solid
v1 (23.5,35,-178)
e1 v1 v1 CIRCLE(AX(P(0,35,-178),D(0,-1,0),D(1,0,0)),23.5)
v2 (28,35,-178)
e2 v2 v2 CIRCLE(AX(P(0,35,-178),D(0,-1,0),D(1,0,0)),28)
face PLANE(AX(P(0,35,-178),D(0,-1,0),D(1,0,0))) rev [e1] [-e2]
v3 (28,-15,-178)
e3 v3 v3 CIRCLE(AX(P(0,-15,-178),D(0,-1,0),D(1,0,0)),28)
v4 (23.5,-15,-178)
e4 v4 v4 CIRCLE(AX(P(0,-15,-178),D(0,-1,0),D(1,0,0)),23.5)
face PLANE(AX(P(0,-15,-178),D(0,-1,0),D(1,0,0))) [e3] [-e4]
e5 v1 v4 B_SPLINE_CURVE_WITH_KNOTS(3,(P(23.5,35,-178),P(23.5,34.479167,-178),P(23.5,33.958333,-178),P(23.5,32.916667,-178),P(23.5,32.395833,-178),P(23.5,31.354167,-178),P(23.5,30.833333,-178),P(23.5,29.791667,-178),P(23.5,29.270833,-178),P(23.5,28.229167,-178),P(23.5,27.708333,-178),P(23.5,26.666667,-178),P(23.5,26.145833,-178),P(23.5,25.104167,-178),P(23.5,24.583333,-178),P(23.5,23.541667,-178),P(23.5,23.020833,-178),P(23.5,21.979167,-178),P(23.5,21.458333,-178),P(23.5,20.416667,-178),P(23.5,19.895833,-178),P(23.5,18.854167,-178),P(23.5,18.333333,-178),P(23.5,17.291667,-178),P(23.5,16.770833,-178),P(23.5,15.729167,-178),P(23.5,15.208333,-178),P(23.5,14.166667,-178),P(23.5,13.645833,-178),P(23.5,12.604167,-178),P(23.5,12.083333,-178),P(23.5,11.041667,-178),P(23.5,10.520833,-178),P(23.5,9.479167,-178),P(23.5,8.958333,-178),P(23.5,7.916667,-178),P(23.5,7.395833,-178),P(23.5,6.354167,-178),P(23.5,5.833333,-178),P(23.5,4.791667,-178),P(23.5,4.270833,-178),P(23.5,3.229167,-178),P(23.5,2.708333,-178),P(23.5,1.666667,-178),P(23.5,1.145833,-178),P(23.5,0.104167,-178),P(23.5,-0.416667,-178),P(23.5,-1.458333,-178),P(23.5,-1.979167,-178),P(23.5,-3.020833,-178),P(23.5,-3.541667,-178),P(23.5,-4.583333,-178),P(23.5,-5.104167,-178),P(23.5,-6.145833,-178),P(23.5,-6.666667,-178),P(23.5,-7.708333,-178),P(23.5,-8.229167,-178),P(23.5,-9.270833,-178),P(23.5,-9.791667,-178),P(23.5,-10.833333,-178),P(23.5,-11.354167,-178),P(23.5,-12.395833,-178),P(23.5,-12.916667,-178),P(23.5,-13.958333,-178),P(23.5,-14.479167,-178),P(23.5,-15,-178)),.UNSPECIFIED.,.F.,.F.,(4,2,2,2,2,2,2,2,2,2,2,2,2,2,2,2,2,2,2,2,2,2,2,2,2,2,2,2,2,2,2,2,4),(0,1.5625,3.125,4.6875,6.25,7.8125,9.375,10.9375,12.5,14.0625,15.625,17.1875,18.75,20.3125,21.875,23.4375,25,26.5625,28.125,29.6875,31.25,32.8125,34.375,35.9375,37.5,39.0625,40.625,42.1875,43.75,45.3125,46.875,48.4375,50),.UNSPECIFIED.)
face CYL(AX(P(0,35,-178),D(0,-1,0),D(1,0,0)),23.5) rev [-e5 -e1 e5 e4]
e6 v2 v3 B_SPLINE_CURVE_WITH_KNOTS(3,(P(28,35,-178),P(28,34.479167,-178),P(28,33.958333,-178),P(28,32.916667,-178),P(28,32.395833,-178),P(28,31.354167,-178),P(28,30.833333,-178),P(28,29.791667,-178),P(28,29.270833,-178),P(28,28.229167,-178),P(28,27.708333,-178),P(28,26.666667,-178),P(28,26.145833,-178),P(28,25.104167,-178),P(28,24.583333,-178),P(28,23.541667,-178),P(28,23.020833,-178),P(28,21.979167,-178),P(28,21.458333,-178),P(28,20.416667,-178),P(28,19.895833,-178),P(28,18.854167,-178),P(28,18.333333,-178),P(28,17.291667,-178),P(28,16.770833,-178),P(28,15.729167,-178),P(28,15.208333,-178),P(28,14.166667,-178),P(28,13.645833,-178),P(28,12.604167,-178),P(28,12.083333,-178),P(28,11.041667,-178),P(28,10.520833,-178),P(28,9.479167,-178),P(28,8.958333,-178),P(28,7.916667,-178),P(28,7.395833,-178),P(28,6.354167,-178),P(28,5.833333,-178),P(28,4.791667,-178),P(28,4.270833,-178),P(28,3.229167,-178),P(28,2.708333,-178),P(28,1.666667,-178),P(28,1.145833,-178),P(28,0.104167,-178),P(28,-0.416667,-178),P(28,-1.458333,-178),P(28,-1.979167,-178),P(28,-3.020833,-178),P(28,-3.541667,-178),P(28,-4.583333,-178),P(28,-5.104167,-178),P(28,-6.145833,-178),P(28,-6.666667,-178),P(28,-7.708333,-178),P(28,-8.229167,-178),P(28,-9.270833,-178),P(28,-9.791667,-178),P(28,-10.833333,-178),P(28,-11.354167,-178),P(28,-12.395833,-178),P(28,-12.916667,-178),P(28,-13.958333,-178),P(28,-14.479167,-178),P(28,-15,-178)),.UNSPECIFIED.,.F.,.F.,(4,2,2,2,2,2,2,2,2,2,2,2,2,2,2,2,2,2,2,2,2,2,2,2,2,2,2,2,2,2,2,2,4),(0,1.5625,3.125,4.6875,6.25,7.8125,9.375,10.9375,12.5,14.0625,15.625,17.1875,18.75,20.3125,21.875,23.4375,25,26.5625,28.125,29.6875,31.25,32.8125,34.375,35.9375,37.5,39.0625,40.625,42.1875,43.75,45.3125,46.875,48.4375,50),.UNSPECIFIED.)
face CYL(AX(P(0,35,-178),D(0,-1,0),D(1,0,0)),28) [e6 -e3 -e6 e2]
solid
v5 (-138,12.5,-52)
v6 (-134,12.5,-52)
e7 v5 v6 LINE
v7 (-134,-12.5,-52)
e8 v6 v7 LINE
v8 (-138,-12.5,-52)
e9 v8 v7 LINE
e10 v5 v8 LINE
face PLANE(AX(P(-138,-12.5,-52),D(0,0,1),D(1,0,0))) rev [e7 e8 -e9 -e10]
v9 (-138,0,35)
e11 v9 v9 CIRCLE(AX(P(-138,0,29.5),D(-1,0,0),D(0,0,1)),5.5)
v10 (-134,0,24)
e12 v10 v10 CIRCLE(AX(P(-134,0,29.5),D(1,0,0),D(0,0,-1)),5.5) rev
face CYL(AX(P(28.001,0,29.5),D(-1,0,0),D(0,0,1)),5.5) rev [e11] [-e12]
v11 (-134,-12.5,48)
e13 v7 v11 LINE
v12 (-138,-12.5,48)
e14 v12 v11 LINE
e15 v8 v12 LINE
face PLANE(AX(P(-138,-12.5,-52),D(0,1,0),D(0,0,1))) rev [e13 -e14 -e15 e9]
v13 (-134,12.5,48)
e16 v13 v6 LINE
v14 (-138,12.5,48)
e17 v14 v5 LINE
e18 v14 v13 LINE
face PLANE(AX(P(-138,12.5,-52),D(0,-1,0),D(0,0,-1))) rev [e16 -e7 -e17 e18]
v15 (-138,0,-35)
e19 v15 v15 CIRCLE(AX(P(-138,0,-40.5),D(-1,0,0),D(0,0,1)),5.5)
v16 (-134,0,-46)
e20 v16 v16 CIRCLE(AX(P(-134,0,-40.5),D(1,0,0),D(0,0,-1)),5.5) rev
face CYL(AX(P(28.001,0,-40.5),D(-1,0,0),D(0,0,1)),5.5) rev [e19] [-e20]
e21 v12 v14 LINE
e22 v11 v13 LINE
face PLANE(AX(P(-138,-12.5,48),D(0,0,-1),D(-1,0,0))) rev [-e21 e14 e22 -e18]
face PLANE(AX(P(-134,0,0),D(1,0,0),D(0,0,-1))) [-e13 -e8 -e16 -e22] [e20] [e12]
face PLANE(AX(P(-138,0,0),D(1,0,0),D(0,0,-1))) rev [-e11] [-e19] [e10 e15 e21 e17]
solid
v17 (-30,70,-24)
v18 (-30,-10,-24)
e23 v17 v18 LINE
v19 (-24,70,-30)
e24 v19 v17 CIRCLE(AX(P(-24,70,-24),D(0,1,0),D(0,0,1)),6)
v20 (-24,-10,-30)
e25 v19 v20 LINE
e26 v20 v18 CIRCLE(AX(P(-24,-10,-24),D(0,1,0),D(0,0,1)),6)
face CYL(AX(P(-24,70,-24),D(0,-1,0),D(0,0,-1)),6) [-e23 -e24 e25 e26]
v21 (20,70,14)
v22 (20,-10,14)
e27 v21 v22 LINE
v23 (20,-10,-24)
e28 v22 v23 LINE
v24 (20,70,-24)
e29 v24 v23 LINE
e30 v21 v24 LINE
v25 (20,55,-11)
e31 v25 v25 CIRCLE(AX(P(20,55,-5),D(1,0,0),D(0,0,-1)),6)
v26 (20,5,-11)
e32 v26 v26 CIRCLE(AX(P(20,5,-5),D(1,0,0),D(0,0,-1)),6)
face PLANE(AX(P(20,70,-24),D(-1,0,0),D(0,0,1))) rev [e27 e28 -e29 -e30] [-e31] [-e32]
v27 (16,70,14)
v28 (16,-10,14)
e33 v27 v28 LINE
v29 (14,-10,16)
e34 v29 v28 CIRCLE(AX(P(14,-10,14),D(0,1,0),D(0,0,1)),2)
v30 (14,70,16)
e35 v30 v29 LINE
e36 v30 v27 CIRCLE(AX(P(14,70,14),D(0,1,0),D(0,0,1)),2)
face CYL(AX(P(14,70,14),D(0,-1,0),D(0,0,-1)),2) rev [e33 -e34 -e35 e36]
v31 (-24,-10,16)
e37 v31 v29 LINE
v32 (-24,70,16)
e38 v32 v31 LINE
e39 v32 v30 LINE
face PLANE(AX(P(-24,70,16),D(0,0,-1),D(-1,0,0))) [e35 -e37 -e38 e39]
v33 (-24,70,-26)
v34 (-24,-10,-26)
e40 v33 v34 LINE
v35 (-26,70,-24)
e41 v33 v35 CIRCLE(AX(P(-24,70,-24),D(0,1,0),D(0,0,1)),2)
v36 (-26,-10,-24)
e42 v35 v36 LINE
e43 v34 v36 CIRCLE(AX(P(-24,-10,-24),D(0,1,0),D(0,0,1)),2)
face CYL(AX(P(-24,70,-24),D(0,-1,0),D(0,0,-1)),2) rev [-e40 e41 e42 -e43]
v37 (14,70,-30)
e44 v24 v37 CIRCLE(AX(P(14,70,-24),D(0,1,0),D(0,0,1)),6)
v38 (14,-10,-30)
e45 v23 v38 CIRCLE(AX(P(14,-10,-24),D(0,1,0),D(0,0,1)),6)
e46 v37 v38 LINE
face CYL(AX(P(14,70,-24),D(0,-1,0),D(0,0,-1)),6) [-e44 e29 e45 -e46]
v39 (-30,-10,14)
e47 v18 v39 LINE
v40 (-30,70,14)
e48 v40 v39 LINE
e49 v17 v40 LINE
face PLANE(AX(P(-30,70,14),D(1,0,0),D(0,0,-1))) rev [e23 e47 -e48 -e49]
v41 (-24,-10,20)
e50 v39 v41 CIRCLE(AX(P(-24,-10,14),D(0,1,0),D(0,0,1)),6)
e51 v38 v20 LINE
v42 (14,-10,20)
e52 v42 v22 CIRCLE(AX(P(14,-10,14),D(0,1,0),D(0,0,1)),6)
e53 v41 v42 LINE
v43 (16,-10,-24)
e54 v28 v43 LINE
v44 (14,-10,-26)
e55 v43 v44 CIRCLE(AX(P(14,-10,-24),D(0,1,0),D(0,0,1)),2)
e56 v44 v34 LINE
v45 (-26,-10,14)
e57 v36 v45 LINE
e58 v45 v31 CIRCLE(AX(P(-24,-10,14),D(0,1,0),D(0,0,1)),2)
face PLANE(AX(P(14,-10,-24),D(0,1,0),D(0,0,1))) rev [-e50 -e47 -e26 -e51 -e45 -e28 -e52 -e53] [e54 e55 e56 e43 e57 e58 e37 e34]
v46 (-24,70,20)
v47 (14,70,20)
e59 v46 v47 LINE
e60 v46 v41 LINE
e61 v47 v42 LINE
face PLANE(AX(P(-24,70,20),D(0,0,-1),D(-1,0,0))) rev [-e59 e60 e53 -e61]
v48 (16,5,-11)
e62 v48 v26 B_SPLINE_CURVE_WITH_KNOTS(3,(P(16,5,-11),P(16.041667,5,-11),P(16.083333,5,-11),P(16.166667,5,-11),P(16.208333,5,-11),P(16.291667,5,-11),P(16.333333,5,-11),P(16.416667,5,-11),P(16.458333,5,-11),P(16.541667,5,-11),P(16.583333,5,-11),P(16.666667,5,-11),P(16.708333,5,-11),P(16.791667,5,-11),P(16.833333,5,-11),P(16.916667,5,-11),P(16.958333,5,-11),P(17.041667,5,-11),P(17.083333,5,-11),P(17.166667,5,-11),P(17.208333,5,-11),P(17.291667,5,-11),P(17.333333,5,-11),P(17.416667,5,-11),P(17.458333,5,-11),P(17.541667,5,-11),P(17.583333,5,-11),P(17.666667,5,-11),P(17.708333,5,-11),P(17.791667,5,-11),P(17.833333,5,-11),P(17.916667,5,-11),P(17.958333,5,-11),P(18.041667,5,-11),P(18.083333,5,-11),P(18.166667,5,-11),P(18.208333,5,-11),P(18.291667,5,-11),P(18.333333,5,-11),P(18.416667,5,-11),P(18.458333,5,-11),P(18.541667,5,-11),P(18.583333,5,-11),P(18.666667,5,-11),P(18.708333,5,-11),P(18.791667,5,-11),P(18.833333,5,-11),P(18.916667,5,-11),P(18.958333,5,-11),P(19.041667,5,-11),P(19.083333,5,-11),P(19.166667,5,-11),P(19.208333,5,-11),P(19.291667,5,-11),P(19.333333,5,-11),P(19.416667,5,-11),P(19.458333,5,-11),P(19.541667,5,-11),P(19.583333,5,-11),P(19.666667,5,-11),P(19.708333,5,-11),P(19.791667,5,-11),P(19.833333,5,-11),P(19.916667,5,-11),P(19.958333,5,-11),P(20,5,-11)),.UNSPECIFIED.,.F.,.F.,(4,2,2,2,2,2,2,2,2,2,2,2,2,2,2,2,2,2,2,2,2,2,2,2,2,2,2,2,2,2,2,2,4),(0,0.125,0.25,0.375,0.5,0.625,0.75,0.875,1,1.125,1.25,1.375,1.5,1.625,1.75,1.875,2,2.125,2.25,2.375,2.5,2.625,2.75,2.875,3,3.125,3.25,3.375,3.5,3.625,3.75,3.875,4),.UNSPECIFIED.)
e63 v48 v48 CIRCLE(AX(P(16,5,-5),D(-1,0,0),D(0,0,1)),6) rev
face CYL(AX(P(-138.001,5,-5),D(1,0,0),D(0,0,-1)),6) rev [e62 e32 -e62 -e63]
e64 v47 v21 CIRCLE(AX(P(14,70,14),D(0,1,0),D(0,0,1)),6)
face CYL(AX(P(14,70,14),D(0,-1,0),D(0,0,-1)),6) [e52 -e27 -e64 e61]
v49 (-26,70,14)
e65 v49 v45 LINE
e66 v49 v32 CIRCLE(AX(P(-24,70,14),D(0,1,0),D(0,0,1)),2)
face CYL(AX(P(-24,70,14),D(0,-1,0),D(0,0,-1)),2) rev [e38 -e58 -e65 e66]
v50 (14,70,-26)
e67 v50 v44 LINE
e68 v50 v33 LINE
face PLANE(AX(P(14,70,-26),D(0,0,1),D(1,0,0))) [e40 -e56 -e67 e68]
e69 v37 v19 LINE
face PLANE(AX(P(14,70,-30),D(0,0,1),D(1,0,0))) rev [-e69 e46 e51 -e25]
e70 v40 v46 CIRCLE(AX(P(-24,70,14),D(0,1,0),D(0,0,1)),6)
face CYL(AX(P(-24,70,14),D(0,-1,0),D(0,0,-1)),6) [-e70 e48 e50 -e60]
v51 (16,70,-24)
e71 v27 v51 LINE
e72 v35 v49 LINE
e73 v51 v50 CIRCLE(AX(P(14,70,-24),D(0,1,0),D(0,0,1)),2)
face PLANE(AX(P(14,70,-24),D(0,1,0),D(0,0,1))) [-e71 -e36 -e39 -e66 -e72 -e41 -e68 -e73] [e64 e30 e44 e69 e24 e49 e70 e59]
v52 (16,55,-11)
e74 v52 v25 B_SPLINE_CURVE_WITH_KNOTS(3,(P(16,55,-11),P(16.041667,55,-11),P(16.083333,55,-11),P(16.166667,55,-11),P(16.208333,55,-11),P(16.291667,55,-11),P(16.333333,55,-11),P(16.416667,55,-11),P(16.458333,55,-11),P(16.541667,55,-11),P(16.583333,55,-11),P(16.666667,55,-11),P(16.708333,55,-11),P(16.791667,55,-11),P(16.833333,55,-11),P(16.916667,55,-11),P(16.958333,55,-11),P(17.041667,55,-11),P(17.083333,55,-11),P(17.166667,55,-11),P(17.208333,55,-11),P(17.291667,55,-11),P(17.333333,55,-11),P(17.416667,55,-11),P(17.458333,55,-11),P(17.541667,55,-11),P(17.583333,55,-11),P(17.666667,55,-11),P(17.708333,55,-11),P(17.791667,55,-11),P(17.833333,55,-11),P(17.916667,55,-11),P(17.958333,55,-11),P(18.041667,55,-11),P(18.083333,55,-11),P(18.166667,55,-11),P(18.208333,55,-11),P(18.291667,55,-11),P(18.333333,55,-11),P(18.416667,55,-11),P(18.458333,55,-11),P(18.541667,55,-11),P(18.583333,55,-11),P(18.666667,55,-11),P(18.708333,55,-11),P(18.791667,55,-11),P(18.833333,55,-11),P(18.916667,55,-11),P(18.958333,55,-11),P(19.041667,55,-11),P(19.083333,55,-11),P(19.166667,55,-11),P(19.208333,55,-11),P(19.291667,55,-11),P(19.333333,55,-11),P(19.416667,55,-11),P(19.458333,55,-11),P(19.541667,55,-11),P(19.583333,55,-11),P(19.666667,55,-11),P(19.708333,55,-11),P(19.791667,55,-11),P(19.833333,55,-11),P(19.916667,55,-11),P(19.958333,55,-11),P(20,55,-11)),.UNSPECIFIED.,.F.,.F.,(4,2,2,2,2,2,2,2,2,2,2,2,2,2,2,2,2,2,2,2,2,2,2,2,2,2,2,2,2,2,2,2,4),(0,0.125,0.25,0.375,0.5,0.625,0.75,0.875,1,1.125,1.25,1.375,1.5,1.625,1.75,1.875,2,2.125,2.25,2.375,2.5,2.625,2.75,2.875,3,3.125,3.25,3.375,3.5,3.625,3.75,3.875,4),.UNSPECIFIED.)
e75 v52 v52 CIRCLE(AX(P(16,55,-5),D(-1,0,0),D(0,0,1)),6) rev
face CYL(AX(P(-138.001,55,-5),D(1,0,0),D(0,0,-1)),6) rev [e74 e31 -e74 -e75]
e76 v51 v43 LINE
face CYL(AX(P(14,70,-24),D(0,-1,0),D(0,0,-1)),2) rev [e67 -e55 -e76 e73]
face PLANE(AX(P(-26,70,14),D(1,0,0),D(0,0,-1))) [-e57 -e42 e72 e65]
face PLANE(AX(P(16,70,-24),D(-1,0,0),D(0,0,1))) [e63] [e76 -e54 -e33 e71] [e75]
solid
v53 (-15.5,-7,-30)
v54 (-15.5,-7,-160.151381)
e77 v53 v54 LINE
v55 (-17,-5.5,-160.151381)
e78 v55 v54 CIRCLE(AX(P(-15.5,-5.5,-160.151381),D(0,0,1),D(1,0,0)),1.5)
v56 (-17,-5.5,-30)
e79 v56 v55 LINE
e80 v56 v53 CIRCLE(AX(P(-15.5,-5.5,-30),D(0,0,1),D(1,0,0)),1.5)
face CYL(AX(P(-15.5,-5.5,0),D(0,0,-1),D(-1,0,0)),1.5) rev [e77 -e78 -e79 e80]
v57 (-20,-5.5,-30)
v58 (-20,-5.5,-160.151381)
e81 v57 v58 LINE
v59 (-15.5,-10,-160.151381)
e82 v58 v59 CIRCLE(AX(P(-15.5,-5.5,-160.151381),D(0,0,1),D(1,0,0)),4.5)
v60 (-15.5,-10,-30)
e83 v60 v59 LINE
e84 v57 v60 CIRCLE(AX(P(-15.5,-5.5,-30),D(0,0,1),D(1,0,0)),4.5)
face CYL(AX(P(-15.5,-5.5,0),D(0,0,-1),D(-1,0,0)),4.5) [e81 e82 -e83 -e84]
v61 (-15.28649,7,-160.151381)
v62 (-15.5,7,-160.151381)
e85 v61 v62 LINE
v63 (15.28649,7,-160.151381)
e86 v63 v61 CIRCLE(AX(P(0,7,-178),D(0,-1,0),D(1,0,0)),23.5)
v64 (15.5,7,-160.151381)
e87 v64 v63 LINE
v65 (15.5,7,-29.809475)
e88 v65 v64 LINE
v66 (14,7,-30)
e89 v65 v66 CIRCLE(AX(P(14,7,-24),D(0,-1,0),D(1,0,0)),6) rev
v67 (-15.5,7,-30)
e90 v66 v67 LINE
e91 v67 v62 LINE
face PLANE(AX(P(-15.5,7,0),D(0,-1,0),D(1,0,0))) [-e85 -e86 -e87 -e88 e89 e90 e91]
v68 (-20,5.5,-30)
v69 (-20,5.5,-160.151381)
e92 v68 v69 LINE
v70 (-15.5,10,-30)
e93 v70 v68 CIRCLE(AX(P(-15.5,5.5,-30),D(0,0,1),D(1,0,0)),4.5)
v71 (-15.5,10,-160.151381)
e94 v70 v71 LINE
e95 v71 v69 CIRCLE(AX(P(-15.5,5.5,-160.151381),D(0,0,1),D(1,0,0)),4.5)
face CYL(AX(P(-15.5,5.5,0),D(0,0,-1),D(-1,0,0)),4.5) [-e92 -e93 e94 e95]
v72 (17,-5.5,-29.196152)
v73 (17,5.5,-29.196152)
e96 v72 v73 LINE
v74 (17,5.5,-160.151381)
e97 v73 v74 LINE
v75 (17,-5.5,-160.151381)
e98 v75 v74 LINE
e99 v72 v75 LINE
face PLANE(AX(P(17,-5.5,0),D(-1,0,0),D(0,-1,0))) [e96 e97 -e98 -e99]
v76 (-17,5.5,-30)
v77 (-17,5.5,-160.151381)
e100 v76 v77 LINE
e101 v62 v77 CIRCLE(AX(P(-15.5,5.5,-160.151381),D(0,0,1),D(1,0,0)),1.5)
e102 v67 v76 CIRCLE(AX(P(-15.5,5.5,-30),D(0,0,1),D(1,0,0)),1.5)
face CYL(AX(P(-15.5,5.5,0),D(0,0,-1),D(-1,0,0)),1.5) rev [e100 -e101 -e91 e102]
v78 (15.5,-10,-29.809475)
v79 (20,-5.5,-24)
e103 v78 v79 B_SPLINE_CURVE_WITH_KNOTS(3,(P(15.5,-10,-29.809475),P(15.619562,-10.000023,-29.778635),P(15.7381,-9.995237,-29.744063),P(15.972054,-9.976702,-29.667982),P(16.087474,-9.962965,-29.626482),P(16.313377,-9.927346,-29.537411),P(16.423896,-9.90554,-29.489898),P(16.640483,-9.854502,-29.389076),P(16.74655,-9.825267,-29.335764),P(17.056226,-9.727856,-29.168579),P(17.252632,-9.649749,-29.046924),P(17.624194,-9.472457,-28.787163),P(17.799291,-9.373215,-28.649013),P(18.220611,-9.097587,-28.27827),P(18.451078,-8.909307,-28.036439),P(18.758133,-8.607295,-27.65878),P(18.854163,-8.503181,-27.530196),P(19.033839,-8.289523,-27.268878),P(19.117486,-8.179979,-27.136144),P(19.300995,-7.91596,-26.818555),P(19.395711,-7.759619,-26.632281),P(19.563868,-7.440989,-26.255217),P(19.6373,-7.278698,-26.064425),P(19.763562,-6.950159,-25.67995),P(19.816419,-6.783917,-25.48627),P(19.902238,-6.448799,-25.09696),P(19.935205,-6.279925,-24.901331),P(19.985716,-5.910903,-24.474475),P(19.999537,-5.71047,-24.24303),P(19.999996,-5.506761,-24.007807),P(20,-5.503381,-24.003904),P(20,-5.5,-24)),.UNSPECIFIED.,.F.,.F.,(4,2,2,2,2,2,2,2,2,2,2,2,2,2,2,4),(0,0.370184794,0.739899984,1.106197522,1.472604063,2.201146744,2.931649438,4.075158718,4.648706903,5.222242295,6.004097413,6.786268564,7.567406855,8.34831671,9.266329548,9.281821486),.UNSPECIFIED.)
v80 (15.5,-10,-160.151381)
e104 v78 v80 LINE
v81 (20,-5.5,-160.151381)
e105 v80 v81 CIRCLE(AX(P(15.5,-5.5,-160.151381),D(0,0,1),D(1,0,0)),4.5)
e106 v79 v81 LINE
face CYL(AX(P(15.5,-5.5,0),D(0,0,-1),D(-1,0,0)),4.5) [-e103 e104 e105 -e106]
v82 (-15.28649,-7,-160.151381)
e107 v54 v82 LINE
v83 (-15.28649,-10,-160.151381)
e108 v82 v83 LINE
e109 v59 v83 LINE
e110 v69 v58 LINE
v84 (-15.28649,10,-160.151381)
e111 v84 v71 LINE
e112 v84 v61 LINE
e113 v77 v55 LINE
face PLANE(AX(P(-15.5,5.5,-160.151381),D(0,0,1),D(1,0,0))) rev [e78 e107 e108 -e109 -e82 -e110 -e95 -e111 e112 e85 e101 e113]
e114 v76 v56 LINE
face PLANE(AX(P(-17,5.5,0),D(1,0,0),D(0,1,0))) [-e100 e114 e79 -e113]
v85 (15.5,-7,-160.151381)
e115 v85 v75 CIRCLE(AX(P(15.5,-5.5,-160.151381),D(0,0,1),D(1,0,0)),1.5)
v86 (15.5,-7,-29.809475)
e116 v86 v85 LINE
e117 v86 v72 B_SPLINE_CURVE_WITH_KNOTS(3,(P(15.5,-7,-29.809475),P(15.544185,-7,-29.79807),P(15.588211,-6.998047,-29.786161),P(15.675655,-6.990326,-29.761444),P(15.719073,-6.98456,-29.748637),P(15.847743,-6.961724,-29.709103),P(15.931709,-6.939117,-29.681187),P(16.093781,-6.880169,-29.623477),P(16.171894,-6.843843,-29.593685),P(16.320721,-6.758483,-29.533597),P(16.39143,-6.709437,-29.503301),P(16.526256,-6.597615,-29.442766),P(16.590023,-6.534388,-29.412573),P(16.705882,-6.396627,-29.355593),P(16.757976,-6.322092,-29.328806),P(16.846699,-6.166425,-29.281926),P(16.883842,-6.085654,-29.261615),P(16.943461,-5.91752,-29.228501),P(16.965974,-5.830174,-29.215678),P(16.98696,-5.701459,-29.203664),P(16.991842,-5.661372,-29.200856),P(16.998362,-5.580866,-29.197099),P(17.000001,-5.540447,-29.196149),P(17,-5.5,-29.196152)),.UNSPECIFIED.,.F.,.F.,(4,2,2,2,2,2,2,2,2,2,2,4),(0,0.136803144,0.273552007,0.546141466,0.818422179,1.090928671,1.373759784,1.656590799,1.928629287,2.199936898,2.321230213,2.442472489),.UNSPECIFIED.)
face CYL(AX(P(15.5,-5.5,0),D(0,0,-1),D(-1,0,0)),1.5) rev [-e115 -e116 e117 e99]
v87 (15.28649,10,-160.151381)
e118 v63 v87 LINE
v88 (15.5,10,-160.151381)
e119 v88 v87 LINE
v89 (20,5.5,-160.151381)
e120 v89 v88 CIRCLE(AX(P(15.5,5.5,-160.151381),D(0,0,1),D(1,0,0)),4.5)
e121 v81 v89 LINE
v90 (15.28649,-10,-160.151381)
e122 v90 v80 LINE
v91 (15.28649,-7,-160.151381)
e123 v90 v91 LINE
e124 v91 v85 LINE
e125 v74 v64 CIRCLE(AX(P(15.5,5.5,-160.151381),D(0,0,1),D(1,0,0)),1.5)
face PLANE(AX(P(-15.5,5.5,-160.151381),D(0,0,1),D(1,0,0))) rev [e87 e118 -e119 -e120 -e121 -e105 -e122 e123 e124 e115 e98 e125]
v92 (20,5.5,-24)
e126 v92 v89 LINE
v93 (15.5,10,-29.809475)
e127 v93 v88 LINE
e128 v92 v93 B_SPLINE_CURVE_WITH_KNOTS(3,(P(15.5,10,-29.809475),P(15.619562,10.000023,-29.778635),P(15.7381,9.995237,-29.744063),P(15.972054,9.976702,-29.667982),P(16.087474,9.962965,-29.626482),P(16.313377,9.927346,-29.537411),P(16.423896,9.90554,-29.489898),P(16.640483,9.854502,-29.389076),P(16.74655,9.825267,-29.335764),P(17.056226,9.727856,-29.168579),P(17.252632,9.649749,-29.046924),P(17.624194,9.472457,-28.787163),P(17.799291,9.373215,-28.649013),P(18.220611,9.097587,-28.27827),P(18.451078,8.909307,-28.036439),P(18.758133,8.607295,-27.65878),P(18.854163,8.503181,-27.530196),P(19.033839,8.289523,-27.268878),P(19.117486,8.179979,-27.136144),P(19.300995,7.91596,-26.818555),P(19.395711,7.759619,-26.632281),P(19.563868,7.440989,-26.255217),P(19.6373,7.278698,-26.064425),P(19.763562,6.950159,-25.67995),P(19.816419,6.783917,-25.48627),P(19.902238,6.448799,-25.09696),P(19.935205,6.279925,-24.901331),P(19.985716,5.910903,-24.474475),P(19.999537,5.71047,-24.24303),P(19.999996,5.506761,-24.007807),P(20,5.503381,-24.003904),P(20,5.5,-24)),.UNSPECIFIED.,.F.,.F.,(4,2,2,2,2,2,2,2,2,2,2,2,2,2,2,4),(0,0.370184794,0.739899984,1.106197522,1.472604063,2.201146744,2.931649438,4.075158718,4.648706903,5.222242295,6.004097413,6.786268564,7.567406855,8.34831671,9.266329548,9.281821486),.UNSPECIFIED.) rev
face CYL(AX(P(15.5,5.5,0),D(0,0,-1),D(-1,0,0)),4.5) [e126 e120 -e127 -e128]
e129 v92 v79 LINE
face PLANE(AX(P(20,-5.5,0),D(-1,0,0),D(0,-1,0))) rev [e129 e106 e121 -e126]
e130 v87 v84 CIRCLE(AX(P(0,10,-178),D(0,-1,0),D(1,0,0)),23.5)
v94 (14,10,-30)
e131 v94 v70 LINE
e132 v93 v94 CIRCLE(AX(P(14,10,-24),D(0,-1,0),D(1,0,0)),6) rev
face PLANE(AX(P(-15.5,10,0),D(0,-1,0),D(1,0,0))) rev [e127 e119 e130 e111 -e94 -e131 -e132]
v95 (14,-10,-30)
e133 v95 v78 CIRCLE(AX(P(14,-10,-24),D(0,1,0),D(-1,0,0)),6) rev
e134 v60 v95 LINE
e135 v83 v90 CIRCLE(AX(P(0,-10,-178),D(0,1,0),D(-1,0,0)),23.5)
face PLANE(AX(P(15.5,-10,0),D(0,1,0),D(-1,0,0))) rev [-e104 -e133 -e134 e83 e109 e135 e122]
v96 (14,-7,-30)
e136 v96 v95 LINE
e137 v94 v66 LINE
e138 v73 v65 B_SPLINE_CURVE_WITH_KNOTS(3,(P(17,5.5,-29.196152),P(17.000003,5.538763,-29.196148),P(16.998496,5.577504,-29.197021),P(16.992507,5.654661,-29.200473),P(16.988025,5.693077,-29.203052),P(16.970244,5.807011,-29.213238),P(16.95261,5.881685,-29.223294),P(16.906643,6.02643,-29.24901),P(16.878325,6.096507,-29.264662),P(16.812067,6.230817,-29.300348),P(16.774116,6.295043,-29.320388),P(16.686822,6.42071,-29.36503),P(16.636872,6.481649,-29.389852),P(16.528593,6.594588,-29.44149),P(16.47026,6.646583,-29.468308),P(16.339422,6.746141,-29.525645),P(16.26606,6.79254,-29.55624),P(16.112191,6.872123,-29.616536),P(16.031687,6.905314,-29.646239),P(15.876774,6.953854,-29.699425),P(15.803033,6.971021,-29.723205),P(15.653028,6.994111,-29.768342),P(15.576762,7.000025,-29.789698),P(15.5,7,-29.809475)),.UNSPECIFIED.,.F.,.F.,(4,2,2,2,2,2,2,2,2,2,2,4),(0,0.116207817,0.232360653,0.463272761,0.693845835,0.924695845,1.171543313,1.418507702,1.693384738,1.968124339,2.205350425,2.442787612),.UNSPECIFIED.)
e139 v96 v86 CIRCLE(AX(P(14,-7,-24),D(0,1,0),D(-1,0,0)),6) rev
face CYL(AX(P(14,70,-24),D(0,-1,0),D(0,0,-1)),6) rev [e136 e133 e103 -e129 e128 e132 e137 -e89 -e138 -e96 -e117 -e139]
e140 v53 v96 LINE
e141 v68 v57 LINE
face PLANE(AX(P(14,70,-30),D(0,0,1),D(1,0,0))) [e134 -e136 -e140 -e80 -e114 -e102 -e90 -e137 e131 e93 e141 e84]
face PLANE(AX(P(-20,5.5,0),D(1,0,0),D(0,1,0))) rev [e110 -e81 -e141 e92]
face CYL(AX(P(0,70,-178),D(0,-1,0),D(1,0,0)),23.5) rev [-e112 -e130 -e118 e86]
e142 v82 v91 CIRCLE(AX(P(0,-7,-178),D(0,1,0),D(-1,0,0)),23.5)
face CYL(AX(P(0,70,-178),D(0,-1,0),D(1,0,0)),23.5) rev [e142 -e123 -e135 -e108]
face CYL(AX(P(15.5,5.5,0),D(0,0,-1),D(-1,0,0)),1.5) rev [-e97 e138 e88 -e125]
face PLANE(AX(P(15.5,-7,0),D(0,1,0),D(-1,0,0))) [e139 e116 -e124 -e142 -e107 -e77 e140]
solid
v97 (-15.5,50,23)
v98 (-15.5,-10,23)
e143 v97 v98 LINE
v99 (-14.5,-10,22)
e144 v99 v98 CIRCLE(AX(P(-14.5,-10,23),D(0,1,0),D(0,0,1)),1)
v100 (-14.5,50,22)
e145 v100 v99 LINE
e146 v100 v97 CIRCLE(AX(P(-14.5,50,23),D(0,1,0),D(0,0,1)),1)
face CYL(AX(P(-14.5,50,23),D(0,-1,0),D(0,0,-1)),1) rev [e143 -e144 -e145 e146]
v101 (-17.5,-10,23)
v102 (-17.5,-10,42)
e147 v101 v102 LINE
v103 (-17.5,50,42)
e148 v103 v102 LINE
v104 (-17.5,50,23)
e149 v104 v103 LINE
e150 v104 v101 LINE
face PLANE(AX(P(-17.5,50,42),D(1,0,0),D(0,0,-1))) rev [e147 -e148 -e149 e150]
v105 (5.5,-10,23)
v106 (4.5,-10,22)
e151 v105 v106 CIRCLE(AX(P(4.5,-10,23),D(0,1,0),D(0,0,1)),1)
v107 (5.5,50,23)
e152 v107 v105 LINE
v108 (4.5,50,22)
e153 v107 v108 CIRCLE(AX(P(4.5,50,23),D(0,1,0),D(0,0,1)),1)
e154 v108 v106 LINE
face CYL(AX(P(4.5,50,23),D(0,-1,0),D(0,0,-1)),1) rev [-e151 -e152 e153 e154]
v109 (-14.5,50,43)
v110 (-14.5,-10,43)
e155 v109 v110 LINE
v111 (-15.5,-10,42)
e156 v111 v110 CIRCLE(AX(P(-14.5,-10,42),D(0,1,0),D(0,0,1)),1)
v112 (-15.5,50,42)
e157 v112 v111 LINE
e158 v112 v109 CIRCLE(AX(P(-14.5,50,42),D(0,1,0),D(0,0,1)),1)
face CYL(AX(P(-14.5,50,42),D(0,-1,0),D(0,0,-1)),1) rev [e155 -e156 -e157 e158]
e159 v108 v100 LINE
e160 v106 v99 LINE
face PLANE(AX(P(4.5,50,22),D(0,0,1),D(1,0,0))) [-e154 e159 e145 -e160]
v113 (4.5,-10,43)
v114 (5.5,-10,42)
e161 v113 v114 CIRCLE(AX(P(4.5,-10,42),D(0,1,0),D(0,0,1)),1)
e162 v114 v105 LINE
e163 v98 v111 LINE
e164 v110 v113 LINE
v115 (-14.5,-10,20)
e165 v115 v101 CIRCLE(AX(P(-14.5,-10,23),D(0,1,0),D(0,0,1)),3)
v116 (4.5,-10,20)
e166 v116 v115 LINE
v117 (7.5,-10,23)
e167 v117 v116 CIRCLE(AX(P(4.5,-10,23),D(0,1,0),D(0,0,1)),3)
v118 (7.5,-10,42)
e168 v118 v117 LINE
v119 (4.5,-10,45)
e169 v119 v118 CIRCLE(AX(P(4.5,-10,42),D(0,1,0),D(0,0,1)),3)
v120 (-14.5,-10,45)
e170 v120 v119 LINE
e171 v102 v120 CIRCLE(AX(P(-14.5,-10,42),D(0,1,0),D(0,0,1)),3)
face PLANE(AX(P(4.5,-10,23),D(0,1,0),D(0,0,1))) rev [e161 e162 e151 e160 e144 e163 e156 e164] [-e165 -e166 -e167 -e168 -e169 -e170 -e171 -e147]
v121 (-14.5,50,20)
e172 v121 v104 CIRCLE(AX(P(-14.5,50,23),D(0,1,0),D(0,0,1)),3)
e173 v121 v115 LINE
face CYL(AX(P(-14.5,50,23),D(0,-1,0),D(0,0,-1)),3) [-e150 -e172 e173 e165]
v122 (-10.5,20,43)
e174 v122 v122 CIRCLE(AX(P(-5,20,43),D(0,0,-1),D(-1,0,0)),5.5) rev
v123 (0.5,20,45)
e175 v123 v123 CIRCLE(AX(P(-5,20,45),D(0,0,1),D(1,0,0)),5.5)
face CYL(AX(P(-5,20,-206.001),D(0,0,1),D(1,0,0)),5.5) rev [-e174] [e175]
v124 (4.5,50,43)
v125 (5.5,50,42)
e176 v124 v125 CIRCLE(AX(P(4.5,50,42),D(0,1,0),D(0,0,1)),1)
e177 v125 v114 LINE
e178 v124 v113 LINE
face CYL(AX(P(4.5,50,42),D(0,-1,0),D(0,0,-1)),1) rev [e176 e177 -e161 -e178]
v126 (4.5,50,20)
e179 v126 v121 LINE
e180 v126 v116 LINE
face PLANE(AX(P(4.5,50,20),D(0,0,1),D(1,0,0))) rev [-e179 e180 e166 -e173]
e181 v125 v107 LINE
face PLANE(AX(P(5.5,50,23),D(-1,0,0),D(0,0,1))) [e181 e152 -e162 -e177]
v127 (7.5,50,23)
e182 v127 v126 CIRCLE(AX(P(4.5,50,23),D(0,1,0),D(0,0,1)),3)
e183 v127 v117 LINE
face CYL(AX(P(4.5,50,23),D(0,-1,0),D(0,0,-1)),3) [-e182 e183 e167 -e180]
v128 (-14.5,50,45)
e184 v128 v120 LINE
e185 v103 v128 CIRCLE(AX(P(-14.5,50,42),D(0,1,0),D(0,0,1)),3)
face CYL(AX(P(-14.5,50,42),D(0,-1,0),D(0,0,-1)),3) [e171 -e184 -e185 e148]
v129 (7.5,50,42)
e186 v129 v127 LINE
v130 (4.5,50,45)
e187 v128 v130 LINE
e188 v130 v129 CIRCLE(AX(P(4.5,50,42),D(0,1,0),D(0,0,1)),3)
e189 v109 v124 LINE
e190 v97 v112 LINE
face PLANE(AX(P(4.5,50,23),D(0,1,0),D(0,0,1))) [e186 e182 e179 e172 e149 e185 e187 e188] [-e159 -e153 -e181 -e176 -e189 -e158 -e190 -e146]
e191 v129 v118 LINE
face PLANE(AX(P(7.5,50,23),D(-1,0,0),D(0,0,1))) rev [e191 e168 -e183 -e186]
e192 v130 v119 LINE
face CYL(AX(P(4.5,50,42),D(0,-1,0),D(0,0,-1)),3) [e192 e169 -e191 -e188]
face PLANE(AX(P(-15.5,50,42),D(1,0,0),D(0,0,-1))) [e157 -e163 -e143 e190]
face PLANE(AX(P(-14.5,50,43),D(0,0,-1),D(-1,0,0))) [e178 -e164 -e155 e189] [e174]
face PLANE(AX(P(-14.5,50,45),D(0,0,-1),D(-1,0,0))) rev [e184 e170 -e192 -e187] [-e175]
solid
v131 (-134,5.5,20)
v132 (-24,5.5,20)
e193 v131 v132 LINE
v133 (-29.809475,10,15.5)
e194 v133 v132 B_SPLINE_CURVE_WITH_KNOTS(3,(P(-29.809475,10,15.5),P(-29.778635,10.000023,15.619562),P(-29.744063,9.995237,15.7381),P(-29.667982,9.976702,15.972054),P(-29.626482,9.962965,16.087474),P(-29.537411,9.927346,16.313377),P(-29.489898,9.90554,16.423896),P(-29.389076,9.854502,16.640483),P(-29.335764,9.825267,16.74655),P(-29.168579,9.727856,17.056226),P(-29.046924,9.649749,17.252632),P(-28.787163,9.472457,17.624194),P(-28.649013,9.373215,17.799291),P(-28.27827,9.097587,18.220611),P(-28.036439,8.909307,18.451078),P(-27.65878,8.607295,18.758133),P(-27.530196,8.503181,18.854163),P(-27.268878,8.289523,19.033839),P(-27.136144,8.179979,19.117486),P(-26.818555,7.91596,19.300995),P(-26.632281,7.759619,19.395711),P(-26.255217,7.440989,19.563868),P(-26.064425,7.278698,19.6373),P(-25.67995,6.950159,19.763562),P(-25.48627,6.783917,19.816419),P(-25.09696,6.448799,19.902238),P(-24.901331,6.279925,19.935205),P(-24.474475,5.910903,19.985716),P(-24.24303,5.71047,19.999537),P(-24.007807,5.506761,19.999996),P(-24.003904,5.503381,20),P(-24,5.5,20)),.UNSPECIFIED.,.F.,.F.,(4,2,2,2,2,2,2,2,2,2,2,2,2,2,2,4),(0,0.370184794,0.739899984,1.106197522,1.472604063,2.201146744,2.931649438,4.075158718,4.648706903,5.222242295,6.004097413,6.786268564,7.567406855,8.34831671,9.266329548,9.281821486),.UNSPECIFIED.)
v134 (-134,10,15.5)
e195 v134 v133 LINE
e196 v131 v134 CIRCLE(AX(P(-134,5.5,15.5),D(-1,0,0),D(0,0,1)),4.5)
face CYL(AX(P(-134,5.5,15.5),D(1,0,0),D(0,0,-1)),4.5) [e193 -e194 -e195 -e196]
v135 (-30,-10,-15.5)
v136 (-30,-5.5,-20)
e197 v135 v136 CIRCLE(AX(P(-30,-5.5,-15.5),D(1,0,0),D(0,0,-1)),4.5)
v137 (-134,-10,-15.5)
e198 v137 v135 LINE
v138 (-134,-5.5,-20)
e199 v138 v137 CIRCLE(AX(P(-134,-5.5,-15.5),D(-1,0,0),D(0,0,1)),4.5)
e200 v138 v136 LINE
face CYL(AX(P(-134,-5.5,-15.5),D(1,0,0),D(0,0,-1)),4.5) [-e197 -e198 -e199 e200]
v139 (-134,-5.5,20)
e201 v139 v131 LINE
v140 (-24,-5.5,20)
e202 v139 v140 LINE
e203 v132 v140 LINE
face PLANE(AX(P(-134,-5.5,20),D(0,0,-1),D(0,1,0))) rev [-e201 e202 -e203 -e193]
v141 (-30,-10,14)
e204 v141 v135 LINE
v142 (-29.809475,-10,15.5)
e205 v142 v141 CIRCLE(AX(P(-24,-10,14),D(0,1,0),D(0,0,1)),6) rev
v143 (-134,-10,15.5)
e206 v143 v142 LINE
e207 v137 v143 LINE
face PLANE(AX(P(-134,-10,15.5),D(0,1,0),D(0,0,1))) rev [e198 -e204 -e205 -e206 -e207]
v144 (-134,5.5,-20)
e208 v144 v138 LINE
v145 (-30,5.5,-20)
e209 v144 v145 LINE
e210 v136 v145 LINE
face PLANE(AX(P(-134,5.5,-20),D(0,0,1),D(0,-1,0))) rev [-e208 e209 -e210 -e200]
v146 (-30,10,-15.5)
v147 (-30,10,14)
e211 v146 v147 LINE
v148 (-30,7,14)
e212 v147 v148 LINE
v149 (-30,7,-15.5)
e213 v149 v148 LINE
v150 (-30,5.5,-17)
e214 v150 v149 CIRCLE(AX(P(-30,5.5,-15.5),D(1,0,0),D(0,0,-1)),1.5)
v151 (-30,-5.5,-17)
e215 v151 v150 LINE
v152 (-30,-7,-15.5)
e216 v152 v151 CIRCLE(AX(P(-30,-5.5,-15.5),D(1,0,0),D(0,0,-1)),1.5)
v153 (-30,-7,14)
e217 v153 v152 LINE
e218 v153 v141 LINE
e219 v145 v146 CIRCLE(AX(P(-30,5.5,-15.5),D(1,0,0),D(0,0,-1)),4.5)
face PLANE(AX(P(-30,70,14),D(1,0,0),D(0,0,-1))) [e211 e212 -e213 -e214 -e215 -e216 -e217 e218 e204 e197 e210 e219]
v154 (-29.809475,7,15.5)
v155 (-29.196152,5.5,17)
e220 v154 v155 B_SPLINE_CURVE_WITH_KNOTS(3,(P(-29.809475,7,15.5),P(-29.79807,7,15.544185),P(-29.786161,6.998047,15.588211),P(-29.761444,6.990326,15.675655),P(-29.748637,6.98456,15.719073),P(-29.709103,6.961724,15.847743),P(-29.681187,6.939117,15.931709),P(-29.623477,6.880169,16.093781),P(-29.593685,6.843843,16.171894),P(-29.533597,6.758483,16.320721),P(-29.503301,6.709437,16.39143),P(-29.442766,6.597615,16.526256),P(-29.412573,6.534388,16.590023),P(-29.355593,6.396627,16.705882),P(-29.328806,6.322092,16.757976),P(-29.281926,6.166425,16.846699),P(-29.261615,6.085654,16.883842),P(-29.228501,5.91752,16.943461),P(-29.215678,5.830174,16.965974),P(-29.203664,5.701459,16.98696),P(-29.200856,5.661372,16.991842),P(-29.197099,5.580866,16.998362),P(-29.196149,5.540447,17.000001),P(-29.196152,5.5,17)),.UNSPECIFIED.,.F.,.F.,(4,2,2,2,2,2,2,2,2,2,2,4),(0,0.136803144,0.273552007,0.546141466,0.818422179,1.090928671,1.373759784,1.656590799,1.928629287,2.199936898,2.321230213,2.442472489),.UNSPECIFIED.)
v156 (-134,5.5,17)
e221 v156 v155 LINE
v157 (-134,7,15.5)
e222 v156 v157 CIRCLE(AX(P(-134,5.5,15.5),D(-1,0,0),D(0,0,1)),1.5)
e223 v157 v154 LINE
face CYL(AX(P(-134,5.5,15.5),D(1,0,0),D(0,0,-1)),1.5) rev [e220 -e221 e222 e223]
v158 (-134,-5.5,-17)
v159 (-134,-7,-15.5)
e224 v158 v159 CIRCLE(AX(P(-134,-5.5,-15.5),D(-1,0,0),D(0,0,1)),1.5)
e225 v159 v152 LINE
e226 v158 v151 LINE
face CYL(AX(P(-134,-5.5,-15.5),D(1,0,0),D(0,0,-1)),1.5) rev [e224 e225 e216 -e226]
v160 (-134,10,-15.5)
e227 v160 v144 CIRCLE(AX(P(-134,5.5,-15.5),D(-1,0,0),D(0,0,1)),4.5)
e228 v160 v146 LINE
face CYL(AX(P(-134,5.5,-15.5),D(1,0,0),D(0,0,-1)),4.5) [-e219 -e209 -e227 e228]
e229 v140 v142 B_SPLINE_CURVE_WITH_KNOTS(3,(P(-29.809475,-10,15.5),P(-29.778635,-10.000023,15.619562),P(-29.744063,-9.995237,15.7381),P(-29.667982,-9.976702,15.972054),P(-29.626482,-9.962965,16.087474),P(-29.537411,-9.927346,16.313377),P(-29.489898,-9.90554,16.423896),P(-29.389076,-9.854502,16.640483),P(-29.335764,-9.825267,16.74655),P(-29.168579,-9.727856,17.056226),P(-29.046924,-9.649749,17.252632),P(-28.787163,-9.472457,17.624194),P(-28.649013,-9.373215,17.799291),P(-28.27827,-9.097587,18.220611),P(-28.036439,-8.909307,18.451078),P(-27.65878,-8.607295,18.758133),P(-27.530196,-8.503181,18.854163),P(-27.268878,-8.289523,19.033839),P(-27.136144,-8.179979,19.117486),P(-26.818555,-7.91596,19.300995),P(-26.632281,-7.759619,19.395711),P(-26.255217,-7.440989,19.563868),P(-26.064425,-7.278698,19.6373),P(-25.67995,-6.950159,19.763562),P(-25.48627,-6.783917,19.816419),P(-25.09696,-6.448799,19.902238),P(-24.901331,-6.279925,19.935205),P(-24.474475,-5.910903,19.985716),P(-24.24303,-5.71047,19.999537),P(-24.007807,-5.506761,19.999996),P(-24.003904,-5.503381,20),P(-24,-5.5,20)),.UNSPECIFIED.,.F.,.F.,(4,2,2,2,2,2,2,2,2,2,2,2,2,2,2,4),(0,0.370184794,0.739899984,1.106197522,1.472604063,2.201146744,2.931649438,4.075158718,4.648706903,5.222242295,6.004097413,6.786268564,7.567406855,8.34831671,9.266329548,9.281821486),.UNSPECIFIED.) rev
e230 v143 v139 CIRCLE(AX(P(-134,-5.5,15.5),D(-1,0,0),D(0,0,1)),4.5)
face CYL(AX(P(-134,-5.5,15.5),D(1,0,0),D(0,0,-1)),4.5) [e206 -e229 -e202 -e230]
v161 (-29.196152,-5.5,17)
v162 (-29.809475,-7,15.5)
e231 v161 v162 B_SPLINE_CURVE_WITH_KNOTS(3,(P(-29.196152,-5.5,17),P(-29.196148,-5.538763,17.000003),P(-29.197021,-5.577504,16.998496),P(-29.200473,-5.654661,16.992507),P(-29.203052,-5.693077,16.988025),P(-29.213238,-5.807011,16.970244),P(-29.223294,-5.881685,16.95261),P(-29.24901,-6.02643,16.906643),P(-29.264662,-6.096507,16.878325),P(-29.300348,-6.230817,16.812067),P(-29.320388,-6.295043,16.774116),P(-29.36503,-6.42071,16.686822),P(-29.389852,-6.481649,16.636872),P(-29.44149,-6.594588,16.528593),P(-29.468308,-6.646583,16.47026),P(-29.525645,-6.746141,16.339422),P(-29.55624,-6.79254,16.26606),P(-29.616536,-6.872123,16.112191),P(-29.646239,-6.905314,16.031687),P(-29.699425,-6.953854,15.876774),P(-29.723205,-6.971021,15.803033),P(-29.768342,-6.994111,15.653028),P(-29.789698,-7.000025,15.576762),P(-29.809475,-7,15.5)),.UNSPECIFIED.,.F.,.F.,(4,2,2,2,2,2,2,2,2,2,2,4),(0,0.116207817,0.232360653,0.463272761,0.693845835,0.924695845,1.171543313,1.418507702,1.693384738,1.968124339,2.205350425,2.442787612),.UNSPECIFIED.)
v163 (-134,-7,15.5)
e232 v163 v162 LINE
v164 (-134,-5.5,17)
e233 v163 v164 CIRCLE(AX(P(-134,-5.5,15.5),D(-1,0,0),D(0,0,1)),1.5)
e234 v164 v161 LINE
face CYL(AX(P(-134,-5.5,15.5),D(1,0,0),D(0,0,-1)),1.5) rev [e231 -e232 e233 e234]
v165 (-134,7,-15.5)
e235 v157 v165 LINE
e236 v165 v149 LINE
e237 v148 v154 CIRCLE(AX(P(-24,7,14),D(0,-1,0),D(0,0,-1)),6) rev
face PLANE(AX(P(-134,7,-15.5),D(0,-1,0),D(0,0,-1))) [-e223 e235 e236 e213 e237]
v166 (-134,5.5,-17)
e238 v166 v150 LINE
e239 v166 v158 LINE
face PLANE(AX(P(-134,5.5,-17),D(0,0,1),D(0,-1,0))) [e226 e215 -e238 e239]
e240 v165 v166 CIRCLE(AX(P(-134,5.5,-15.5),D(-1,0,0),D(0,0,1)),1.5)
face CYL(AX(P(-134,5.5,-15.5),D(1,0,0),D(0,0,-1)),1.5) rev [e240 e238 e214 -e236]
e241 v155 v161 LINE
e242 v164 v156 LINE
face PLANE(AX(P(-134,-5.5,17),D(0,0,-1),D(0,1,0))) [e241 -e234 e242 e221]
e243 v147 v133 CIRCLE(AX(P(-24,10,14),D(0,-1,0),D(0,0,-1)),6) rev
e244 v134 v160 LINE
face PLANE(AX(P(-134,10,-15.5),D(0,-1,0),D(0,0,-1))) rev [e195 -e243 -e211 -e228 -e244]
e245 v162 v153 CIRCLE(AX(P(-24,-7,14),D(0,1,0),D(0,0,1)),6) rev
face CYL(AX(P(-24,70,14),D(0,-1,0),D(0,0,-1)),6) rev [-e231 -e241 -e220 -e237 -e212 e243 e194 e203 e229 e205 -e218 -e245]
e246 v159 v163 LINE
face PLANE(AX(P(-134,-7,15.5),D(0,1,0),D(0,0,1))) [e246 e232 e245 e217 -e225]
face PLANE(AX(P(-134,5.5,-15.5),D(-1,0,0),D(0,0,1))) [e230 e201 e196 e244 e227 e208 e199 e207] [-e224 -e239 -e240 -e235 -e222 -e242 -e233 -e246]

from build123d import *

# Parameters (mm, degrees)
AXBXS_8645_68_40_X_20_X_3_1_DEPTH        = 173.360679775
AXBXS_8645_68_40_X_20_X_3_1_2_DEPTH      = 134
AXBXS_8645_68_40_X_20_X_3_1_2_DEPTH_BACK = 23.360679775
BXBXS_8639_82_50_X_50_X_4_2_DEPTH        = 10
BXBXS_8639_82_50_X_50_X_4_2_2_DEPTH      = 70
WELD_START                               = -10
WELD_TRIM_1_DEPTH                        = 20
WELD_TRIM_1_2_DEPTH                      = 20
EXTRUDE_1_DEPTH                          = 5
EXTRUDE_1_DEPTH_BACK                     = 45
SKETCH_8_R                               = 28
SKETCH_8_R_2                             = 23.5
MOVE_FACE_1_BY                           = 10.151380586
CUT_EXTRUDE_1_DEPTH                      = 261.032690304
CUT_EXTRUDE_1_DEPTH_BACK                 = 261.032690304
SKETCH_10_R                              = 23.5
SKETCH_11_W                              = 100
SKETCH_11_H                              = 25
EXTRUDE_2_DEPTH                          = 4
SKETCH_12_R                              = 5.5
CUT_EXTRUDE_2_DEPTH                      = 4
BXBXS_8639_82_25_X_25_X_2_1_DEPTH        = 60
SKETCH_15_R                              = 5.5
CUT_EXTRUDE_3_DEPTH                      = 2
SKETCH_18_R                              = 6
CUT_EXTRUDE_6_DEPTH                      = 4


# Read off the part's stored shape, not the designer's step: Отсечь/Удлинить1
with BuildPart() as part:
    # Sketch1 on segment 1 (carried to segment 1) → Труба axbxs гост8645-68 40 X 20 X 3(1) (new body)
    with BuildSketch(Plane(origin=(0, 0, -150), x_dir=(0, 1, 0), z_dir=(0, 0, 1))):
        with BuildLine():
            Line((-5.5, -20), (5.5, -20))
            ThreePointArc((5.5, -20), (8.681980515, -18.681980515), (10, -15.5))
            Line((10, -15.5), (10, 15.5))
            ThreePointArc((10, 15.5), (8.681980515, 18.681980515), (5.5, 20))
            Line((5.5, 20), (-5.5, 20))
            ThreePointArc((-5.5, 20), (-8.681980515, 18.681980515), (-10, 15.5))
            Line((-10, 15.5), (-10, -15.5))
            ThreePointArc((-10, -15.5), (-8.681980515, -18.681980515), (-5.5, -20))
        make_face()
        with BuildLine():
            Line((-5.5, -17), (5.5, -17))
            ThreePointArc((5.5, -17), (6.560660172, -16.560660172), (7, -15.5))
            Line((7, -15.5), (7, 15.5))
            ThreePointArc((7, 15.5), (6.560660172, 16.560660172), (5.5, 17))
            Line((5.5, 17), (-5.5, 17))
            ThreePointArc((-5.5, 17), (-6.560660172, 16.560660172), (-7, 15.5))
            Line((-7, 15.5), (-7, -15.5))
            ThreePointArc((-7, -15.5), (-6.560660172, -16.560660172), (-5.5, -17))
        make_face(mode=Mode.SUBTRACT)
    extrude(amount=AXBXS_8645_68_40_X_20_X_3_1_DEPTH)

    # Труба axbxs гост8645-68 40 X 20 X 3(1) mitre 1
    split(bisect_by=Plane(origin=(0, 0, 0), x_dir=(0, 1, 0), z_dir=(0.707106781, 0, -0.707106781)), keep=Keep.TOP)

    # Weld Trim 1 2 outline → Weld Trim 1 2 (cut)
    with BuildSketch(Plane(origin=(0, 0, 0), x_dir=(1, 0, 0), z_dir=(0, 1, 0)).offset(WELD_START)):
        with BuildLine():
            Line((14, 30), (-20, 30))
            Line((-20, 30), (-20, 20))
            Line((-20, 20), (20, -20))
            Line((20, -20), (20, 24))
            ThreePointArc((20, 24), (18.242640687, 28.242640687), (14, 30))
        make_face()
    extrude(amount=WELD_TRIM_1_2_DEPTH, mode=Mode.SUBTRACT)

    # Move Face 1: a face moved outward by 10.151381
    extrude(part.faces().sort_by_distance((0, -8, -150))[0], amount=MOVE_FACE_1_BY, dir=(0, 0, -1))

    # Эскиз10 → Вырез-Вытянуть1 (cut, two sides: drawn at the far end of the back side and taken through both)
    with BuildSketch(Plane.XZ.offset(15).offset(-CUT_EXTRUDE_1_DEPTH_BACK)):
        with Locations((0, -178)):
            Circle(SKETCH_10_R)
    extrude(amount=CUT_EXTRUDE_1_DEPTH + CUT_EXTRUDE_1_DEPTH_BACK, mode=Mode.SUBTRACT)


with BuildPart() as body_2:
    # Sketch1 → axbxs _8645-68 40 X 20 X 3_1 2 (new, two sides: drawn at the far end of the back side and taken through both)
    with BuildSketch(Plane(origin=(0, 0, 0), x_dir=(0, 1, 0), z_dir=(-1, 0, 0)).offset(-AXBXS_8645_68_40_X_20_X_3_1_2_DEPTH_BACK)):
        with BuildLine():
            Line((-5.5, -20), (5.5, -20))
            ThreePointArc((5.5, -20), (8.681980515, -18.681980515), (10, -15.5))
            Line((10, -15.5), (10, 15.5))
            ThreePointArc((10, 15.5), (8.681980515, 18.681980515), (5.5, 20))
            Line((5.5, 20), (-5.5, 20))
            ThreePointArc((-5.5, 20), (-8.681980515, 18.681980515), (-10, 15.5))
            Line((-10, 15.5), (-10, -15.5))
            ThreePointArc((-10, -15.5), (-8.681980515, -18.681980515), (-5.5, -20))
        make_face()
        with BuildLine():
            Line((-5.5, -17), (5.5, -17))
            ThreePointArc((5.5, -17), (6.560660172, -16.560660172), (7, -15.5))
            Line((7, -15.5), (7, 15.5))
            ThreePointArc((7, 15.5), (6.560660172, 16.560660172), (5.5, 17))
            Line((5.5, 17), (-5.5, 17))
            ThreePointArc((-5.5, 17), (-6.560660172, 16.560660172), (-7, 15.5))
            Line((-7, 15.5), (-7, -15.5))
            ThreePointArc((-7, -15.5), (-6.560660172, -16.560660172), (-5.5, -17))
        make_face(mode=Mode.SUBTRACT)
    extrude(amount=AXBXS_8645_68_40_X_20_X_3_1_2_DEPTH + AXBXS_8645_68_40_X_20_X_3_1_2_DEPTH_BACK)

    # axbxs _8645-68 40 X 20 X 3_1 2 mitre 1
    split(bisect_by=Plane(origin=(0, 0, 0), x_dir=(0, -1, 0), z_dir=(-0.707106781, 0, 0.707106781)), keep=Keep.TOP)

    # Weld Trim 1 outline → Weld Trim 1 (cut)
    with BuildSketch(Plane(origin=(0, 0, 0), x_dir=(1, 0, 0), z_dir=(0, 1, 0)).offset(WELD_START)):
        with BuildLine():
            ThreePointArc((-30, -14), (-28.242640687, -18.242640687), (-24, -20))
            Line((-24, -20), (20, -20))
            Line((20, -20), (-20, 20))
            Line((-20, 20), (-30, 20))
            Line((-30, 20), (-30, -14))
        make_face()
    extrude(amount=WELD_TRIM_1_DEPTH, mode=Mode.SUBTRACT)


with BuildPart() as body_3:
    # Sketch14 → Труба bxbxs гост8639-82 50 X 50 X 4(2) (new body)
    with BuildSketch(Plane(origin=(-5, 0, -5), x_dir=(1, 0, 0), z_dir=(0, 1, 0))):
        with BuildLine():
            Line((-19, -25), (19, -25))
            ThreePointArc((19, -25), (23.242640687, -23.242640687), (25, -19))
            Line((25, -19), (25, 19))
            ThreePointArc((25, 19), (23.242640687, 23.242640687), (19, 25))
            Line((19, 25), (-19, 25))
            ThreePointArc((-19, 25), (-23.242640687, 23.242640687), (-25, 19))
            Line((-25, 19), (-25, -19))
            ThreePointArc((-25, -19), (-23.242640687, -23.242640687), (-19, -25))
        make_face()
        with BuildLine():
            Line((-19, -21), (19, -21))
            ThreePointArc((19, -21), (20.414213562, -20.414213562), (21, -19))
            Line((21, -19), (21, 19))
            ThreePointArc((21, 19), (20.414213562, 20.414213562), (19, 21))
            Line((19, 21), (-19, 21))
            ThreePointArc((-19, 21), (-20.414213562, 20.414213562), (-21, 19))
            Line((-21, 19), (-21, -19))
            ThreePointArc((-21, -19), (-20.414213562, -20.414213562), (-19, -21))
        make_face(mode=Mode.SUBTRACT)
    extrude(amount=-BXBXS_8639_82_50_X_50_X_4_2_DEPTH)


with BuildPart() as body_4:
    # Sketch14 on segment 2 (carried to segment 2) → bxbxs _8639-82 50 X 50 X 4_2 2 (new body)
    with BuildSketch(Plane(origin=(-5, 0, -5), x_dir=(1, 0, 0), z_dir=(0, 1, 0))):
        with BuildLine():
            Line((-19, -25), (19, -25))
            ThreePointArc((19, -25), (23.242640687, -23.242640687), (25, -19))
            Line((25, -19), (25, 19))
            ThreePointArc((25, 19), (23.242640687, 23.242640687), (19, 25))
            Line((19, 25), (-19, 25))
            ThreePointArc((-19, 25), (-23.242640687, 23.242640687), (-25, 19))
            Line((-25, 19), (-25, -19))
            ThreePointArc((-25, -19), (-23.242640687, -23.242640687), (-19, -25))
        make_face()
        with BuildLine():
            Line((-19, -21), (19, -21))
            ThreePointArc((19, -21), (20.414213562, -20.414213562), (21, -19))
            Line((21, -19), (21, 19))
            ThreePointArc((21, 19), (20.414213562, 20.414213562), (19, 21))
            Line((19, 21), (-19, 21))
            ThreePointArc((-19, 21), (-20.414213562, 20.414213562), (-21, 19))
            Line((-21, 19), (-21, -19))
            ThreePointArc((-21, -19), (-20.414213562, -20.414213562), (-19, -21))
        make_face(mode=Mode.SUBTRACT)
    extrude(amount=BXBXS_8639_82_50_X_50_X_4_2_2_DEPTH)


with BuildPart() as body_5:
    # Эскиз8 → Бобышка-Вытянуть1 (new, two sides: drawn at the far end of the back side and taken through both)
    with BuildSketch(Plane.XZ.offset(10).offset(-EXTRUDE_1_DEPTH_BACK)):
        with Locations((0, -178)):
            Circle(SKETCH_8_R)
        with Locations((0, -178)):
            Circle(SKETCH_8_R_2, mode=Mode.SUBTRACT)
    extrude(amount=EXTRUDE_1_DEPTH + EXTRUDE_1_DEPTH_BACK)


with BuildPart() as body_6:
    # Эскиз11 → Бобышка-Вытянуть2 (new body)
    with BuildSketch(Plane.ZY.offset(134)):
        with Locations((-2, 0)):
            Rectangle(SKETCH_11_W, SKETCH_11_H)
    extrude(amount=EXTRUDE_2_DEPTH)

    # Эскиз12 → Вырез-Вытянуть2 (cut)
    with BuildSketch(Plane.ZY.offset(138)):
        with Locations((-40.5, 0)):
            Circle(SKETCH_12_R)
        with Locations((29.5, 0)):
            Circle(SKETCH_12_R)
    extrude(amount=-CUT_EXTRUDE_2_DEPTH, mode=Mode.SUBTRACT)


with BuildPart() as body_7:
    # Sketch15 → Труба bxbxs гост8639-82 25 X 25 X 2(1) (new body)
    with BuildSketch(Plane(origin=(-5, -10, 32.5), x_dir=(1, 0, 0), z_dir=(0, 1, 0))):
        with BuildLine():
            Line((-9.5, -12.5), (9.5, -12.5))
            ThreePointArc((9.5, -12.5), (11.621320344, -11.621320344), (12.5, -9.5))
            Line((12.5, -9.5), (12.5, 9.5))
            ThreePointArc((12.5, 9.5), (11.621320344, 11.621320344), (9.5, 12.5))
            Line((9.5, 12.5), (-9.5, 12.5))
            ThreePointArc((-9.5, 12.5), (-11.621320344, 11.621320344), (-12.5, 9.5))
            Line((-12.5, 9.5), (-12.5, -9.5))
            ThreePointArc((-12.5, -9.5), (-11.621320344, -11.621320344), (-9.5, -12.5))
        make_face()
        with BuildLine():
            Line((-9.5, -10.5), (9.5, -10.5))
            ThreePointArc((9.5, -10.5), (10.207106781, -10.207106781), (10.5, -9.5))
            Line((10.5, -9.5), (10.5, 9.5))
            ThreePointArc((10.5, 9.5), (10.207106781, 10.207106781), (9.5, 10.5))
            Line((9.5, 10.5), (-9.5, 10.5))
            ThreePointArc((-9.5, 10.5), (-10.207106781, 10.207106781), (-10.5, 9.5))
            Line((-10.5, 9.5), (-10.5, -9.5))
            ThreePointArc((-10.5, -9.5), (-10.207106781, -10.207106781), (-9.5, -10.5))
        make_face(mode=Mode.SUBTRACT)
    extrude(amount=BXBXS_8639_82_25_X_25_X_2_1_DEPTH)

    # Эскиз15 → Вырез-Вытянуть3 (cut)
    with BuildSketch(Plane.XY.offset(45)):
        with Locations((-5, 20)):
            Circle(SKETCH_15_R)
    extrude(amount=-CUT_EXTRUDE_3_DEPTH, mode=Mode.SUBTRACT)


with BuildPart() as body_3_1:
    add(body_3.part)

    # Combine 1: union body 4
    add(body_4.part)

    # Эскиз18 → Вырез-Вытянуть6 (cut)
    with BuildSketch(Plane(origin=(20, 0, 0), x_dir=(0, 0, -1), z_dir=(1, 0, 0))):
        with Locations((5, 55)):
            Circle(SKETCH_18_R)
        with Locations((5, 5)):
            Circle(SKETCH_18_R)
    extrude(amount=-CUT_EXTRUDE_6_DEPTH, mode=Mode.SUBTRACT)


solid = Compound([part.part, body_2.part, body_5.part, body_6.part, body_7.part, body_3_1.part])
